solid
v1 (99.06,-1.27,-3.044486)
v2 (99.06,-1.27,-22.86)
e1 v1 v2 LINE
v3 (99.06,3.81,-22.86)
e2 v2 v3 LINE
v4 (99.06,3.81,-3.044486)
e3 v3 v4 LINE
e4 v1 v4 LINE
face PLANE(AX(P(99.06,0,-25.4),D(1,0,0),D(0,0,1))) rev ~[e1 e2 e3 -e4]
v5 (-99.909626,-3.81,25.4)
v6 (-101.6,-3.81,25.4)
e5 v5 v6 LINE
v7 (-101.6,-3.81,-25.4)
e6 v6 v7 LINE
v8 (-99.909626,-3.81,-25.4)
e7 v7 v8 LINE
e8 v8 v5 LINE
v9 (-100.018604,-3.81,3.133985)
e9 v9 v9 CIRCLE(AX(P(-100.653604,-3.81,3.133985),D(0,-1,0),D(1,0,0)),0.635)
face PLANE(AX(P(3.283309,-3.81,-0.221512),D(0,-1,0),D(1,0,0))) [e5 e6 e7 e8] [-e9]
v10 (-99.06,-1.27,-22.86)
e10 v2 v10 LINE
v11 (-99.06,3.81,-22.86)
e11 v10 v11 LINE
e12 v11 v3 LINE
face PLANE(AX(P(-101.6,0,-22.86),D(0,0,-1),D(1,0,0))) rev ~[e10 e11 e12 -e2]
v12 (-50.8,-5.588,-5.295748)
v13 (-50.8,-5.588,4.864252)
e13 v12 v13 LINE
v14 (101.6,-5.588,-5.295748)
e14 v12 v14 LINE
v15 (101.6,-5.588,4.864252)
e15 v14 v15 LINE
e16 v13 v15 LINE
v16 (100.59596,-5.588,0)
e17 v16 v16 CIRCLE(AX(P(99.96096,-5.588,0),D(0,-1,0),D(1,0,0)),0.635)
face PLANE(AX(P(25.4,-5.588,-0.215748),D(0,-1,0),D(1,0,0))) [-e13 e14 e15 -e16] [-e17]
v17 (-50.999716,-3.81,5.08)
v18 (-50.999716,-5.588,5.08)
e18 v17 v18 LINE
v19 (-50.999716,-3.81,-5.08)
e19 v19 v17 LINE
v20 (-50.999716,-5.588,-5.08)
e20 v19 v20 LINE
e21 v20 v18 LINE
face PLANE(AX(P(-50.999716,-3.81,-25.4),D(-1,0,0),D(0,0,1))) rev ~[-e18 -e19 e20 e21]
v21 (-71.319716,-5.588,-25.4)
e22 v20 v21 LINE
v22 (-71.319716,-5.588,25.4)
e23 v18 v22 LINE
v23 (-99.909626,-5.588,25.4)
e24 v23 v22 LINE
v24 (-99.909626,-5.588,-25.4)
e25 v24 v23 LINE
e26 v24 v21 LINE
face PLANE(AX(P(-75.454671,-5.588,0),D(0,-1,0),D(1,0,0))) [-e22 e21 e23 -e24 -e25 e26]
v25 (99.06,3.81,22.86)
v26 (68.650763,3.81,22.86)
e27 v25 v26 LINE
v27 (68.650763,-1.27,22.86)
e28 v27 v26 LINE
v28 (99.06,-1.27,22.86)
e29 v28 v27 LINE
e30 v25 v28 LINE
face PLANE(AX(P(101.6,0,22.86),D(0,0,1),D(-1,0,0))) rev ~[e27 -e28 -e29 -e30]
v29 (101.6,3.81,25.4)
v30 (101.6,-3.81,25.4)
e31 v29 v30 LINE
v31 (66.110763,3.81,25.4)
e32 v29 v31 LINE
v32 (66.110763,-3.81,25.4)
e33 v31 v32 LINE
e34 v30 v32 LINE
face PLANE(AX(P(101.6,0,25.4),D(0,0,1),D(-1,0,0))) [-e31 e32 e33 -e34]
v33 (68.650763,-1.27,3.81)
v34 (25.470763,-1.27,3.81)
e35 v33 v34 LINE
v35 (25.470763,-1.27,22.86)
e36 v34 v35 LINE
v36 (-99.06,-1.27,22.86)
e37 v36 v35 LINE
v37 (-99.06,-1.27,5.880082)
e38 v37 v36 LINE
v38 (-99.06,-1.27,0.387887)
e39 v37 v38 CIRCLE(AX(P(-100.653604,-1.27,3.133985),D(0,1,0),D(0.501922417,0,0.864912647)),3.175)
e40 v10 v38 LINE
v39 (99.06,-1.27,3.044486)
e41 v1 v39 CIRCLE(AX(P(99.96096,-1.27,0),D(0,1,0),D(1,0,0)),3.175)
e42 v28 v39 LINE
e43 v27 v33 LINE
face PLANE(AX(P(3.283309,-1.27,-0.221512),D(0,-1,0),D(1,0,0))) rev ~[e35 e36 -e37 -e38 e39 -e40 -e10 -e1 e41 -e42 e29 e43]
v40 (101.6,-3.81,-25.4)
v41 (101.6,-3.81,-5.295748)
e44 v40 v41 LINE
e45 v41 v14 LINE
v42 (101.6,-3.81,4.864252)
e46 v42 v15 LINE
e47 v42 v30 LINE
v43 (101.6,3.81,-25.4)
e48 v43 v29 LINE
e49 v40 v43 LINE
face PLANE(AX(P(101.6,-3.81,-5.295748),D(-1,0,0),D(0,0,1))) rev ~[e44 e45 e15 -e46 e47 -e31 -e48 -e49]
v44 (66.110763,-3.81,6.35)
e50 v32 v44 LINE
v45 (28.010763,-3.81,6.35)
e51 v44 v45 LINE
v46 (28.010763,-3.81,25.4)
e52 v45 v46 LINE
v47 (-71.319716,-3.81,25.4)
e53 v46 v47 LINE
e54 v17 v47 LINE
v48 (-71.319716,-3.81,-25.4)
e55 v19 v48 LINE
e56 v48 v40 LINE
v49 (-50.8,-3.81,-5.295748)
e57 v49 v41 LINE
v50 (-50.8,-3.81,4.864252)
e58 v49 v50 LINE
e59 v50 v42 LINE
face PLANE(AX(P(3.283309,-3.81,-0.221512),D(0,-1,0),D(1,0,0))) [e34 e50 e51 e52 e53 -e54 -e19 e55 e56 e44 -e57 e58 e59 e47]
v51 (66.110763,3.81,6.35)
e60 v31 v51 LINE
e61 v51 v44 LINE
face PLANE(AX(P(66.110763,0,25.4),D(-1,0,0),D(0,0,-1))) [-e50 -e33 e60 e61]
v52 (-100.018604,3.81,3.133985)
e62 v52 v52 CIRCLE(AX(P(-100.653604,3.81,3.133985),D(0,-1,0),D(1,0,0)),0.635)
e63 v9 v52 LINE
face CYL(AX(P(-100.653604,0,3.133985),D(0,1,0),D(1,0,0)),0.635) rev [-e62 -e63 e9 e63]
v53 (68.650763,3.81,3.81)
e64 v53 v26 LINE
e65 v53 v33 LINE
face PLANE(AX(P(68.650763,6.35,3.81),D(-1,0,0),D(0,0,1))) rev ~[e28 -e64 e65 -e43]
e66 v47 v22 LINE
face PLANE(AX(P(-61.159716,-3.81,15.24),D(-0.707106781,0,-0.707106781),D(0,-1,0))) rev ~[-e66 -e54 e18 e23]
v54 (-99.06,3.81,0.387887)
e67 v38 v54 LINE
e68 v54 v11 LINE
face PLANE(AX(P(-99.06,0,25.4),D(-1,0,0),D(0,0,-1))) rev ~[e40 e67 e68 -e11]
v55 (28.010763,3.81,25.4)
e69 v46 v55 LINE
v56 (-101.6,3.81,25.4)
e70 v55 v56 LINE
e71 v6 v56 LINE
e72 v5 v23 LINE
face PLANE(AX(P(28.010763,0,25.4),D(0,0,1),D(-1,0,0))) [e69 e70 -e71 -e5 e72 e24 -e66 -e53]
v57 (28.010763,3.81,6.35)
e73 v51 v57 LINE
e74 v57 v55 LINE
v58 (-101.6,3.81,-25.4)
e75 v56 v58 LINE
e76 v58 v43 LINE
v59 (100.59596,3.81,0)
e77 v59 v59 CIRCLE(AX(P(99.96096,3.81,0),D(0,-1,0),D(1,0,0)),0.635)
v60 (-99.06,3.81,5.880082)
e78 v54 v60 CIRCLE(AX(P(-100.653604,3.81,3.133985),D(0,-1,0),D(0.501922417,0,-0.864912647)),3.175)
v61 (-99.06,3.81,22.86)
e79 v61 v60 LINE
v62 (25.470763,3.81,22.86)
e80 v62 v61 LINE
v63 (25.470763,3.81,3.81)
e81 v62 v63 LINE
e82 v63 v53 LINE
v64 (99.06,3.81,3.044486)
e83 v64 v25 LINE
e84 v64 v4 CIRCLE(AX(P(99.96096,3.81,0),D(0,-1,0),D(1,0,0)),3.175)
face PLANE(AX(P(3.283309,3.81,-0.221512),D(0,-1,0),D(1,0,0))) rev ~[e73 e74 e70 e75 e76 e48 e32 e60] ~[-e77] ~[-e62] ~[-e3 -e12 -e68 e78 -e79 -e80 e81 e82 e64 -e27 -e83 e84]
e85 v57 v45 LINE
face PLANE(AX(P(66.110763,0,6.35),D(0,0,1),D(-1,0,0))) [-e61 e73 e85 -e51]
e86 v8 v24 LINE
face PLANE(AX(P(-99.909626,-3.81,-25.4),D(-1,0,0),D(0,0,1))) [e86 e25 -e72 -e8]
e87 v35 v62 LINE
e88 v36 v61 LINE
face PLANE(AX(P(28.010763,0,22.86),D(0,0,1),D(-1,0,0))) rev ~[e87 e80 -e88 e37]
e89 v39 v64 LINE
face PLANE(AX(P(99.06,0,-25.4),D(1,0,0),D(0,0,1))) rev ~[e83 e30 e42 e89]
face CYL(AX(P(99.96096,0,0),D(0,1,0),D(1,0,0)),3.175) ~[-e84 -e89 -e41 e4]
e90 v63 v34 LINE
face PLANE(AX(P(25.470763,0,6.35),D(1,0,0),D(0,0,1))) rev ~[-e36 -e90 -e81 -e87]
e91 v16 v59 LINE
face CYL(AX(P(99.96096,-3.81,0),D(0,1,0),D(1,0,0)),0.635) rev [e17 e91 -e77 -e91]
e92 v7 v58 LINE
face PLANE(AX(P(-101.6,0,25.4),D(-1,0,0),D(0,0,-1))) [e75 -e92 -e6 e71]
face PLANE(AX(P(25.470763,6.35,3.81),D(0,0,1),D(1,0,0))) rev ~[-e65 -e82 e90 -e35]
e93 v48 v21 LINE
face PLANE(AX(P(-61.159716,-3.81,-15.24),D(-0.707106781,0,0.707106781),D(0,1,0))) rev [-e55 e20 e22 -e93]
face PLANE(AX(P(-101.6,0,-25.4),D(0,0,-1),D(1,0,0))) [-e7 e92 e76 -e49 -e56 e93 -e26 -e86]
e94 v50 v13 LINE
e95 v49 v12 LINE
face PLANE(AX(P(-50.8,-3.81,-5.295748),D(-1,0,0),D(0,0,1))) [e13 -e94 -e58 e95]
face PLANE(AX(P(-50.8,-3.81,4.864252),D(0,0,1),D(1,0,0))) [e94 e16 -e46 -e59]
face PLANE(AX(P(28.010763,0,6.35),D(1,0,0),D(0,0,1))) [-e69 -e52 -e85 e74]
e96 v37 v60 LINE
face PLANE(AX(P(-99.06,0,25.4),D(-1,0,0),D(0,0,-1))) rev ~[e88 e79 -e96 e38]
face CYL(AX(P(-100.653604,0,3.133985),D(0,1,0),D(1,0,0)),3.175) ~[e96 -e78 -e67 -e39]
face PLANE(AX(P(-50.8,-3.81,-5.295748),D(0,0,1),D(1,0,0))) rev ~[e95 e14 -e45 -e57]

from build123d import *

# Parameters (mm, degrees)
F0_R        = 0.635
F1_DEPTH    = 3.81
F2_T        = 2.54
F2_T3_DEPTH = 12.7
F3_W        = 152.4
F3_H        = 10.16
F3_R        = 0.635
F4_DEPTH    = 1.778
F5_W        = 48.9099100232
F5_H        = 50.8
F6_DEPTH    = 1.778
F7_SIZE     = 20.32


# Not quite as in the source:
# - a shell that OpenCascade refuses in one call is made with other operations: the cavity is built on its own and cut out


with BuildPart() as f1:
    # F0 (on Front) → F1 (new body, symmetric)
    with BuildSketch(Plane.XZ):
        Polygon((101.6, -25.4), (101.6, 25.4), (66.1107632279, 25.4), (66.1107632279, 6.35), (28.0107632279, 6.35), (28.0107632279, 25.4), (-101.6, 25.4), (-101.6, -25.4), align=None)
        with Locations((99.9609604478, 0)):
            Circle(F0_R, mode=Mode.SUBTRACT)
        with Locations((-100.653603673, 3.1339845154)):
            Circle(F0_R, mode=Mode.SUBTRACT)
    extrude(amount=F1_DEPTH, both=True)

    # F2: shell of thickness 2.54, made by hand


with BuildPart() as f2_core1:
    # F2_t2: copy of F1
    add(f1.part)

    # the walls: a layer under each face that stays
    f2_faces = [f2_core1.faces().sort_by_distance(p)[0] for p in [
        (101.6, 0, 0),
        (0, 0, -25.4),
        (-101.6, 0, 0),
        (-36.794618386, 0, 25.4),
        (28.0107632279, 0, 15.875),
        (47.0607632279, 0, 6.35),
        (66.1107632279, 0, 15.875),
        (0, -3.81, 0),
        (-101.288603673, 0, 3.1339845154),
        (99.3259604478, 0, 0),
        (83.855381614, 0, 25.4),
    ]]
    thicken(f2_faces, amount=-F2_T, mode=Mode.SUBTRACT)

    # F2_s4 → F2_t3 (cut)
    with BuildSketch(Plane.XZ.offset(-6.35)):
        Polygon((28.0361632279, 6.3754), (25.4707632279, 6.35), (25.4707632279, 3.81), (28.0107632279, 3.81), align=None)
        Polygon((66.0853632279, 6.3754), (66.1107632279, 3.81), (68.6507632279, 3.81), (68.6507632279, 6.35), align=None)
    extrude(amount=F2_T3_DEPTH, mode=Mode.SUBTRACT)


with BuildPart() as f1_1:
    add(f1.part)

    # what is left inside the walls is the cavity
    f2_cavity = [f2_core1.part.solids().sort_by_distance(p)[0] for p in [
        (0, 3.7846, -7.62),
    ]]
    add(f2_cavity, mode=Mode.SUBTRACT)

    # F3 (on face) → F4 (join)
    with BuildSketch(Plane.XZ.offset(3.81)):
        with Locations((25.4, -0.2157475356)):
            Rectangle(F3_W, F3_H)
        with Locations((99.9609604478, 0)):
            Circle(F3_R, mode=Mode.SUBTRACT)
    extrude(amount=F4_DEPTH)

    # F5 (on face) → F6 (join)
    with BuildSketch(Plane.XZ.offset(3.81)):
        with Locations((-75.4546709359, 0)):
            Rectangle(F5_W, F5_H)
    extrude(amount=F6_DEPTH)

    # F7
    f7_edges = [f1_1.edges().sort_by_distance(p)[0] for p in [
        (-50.999716, -4.699, 25.4),
        (-50.999716, -4.699, -25.4),
    ]]
    chamfer(f7_edges, length=F7_SIZE)


solid = f1_1.part
